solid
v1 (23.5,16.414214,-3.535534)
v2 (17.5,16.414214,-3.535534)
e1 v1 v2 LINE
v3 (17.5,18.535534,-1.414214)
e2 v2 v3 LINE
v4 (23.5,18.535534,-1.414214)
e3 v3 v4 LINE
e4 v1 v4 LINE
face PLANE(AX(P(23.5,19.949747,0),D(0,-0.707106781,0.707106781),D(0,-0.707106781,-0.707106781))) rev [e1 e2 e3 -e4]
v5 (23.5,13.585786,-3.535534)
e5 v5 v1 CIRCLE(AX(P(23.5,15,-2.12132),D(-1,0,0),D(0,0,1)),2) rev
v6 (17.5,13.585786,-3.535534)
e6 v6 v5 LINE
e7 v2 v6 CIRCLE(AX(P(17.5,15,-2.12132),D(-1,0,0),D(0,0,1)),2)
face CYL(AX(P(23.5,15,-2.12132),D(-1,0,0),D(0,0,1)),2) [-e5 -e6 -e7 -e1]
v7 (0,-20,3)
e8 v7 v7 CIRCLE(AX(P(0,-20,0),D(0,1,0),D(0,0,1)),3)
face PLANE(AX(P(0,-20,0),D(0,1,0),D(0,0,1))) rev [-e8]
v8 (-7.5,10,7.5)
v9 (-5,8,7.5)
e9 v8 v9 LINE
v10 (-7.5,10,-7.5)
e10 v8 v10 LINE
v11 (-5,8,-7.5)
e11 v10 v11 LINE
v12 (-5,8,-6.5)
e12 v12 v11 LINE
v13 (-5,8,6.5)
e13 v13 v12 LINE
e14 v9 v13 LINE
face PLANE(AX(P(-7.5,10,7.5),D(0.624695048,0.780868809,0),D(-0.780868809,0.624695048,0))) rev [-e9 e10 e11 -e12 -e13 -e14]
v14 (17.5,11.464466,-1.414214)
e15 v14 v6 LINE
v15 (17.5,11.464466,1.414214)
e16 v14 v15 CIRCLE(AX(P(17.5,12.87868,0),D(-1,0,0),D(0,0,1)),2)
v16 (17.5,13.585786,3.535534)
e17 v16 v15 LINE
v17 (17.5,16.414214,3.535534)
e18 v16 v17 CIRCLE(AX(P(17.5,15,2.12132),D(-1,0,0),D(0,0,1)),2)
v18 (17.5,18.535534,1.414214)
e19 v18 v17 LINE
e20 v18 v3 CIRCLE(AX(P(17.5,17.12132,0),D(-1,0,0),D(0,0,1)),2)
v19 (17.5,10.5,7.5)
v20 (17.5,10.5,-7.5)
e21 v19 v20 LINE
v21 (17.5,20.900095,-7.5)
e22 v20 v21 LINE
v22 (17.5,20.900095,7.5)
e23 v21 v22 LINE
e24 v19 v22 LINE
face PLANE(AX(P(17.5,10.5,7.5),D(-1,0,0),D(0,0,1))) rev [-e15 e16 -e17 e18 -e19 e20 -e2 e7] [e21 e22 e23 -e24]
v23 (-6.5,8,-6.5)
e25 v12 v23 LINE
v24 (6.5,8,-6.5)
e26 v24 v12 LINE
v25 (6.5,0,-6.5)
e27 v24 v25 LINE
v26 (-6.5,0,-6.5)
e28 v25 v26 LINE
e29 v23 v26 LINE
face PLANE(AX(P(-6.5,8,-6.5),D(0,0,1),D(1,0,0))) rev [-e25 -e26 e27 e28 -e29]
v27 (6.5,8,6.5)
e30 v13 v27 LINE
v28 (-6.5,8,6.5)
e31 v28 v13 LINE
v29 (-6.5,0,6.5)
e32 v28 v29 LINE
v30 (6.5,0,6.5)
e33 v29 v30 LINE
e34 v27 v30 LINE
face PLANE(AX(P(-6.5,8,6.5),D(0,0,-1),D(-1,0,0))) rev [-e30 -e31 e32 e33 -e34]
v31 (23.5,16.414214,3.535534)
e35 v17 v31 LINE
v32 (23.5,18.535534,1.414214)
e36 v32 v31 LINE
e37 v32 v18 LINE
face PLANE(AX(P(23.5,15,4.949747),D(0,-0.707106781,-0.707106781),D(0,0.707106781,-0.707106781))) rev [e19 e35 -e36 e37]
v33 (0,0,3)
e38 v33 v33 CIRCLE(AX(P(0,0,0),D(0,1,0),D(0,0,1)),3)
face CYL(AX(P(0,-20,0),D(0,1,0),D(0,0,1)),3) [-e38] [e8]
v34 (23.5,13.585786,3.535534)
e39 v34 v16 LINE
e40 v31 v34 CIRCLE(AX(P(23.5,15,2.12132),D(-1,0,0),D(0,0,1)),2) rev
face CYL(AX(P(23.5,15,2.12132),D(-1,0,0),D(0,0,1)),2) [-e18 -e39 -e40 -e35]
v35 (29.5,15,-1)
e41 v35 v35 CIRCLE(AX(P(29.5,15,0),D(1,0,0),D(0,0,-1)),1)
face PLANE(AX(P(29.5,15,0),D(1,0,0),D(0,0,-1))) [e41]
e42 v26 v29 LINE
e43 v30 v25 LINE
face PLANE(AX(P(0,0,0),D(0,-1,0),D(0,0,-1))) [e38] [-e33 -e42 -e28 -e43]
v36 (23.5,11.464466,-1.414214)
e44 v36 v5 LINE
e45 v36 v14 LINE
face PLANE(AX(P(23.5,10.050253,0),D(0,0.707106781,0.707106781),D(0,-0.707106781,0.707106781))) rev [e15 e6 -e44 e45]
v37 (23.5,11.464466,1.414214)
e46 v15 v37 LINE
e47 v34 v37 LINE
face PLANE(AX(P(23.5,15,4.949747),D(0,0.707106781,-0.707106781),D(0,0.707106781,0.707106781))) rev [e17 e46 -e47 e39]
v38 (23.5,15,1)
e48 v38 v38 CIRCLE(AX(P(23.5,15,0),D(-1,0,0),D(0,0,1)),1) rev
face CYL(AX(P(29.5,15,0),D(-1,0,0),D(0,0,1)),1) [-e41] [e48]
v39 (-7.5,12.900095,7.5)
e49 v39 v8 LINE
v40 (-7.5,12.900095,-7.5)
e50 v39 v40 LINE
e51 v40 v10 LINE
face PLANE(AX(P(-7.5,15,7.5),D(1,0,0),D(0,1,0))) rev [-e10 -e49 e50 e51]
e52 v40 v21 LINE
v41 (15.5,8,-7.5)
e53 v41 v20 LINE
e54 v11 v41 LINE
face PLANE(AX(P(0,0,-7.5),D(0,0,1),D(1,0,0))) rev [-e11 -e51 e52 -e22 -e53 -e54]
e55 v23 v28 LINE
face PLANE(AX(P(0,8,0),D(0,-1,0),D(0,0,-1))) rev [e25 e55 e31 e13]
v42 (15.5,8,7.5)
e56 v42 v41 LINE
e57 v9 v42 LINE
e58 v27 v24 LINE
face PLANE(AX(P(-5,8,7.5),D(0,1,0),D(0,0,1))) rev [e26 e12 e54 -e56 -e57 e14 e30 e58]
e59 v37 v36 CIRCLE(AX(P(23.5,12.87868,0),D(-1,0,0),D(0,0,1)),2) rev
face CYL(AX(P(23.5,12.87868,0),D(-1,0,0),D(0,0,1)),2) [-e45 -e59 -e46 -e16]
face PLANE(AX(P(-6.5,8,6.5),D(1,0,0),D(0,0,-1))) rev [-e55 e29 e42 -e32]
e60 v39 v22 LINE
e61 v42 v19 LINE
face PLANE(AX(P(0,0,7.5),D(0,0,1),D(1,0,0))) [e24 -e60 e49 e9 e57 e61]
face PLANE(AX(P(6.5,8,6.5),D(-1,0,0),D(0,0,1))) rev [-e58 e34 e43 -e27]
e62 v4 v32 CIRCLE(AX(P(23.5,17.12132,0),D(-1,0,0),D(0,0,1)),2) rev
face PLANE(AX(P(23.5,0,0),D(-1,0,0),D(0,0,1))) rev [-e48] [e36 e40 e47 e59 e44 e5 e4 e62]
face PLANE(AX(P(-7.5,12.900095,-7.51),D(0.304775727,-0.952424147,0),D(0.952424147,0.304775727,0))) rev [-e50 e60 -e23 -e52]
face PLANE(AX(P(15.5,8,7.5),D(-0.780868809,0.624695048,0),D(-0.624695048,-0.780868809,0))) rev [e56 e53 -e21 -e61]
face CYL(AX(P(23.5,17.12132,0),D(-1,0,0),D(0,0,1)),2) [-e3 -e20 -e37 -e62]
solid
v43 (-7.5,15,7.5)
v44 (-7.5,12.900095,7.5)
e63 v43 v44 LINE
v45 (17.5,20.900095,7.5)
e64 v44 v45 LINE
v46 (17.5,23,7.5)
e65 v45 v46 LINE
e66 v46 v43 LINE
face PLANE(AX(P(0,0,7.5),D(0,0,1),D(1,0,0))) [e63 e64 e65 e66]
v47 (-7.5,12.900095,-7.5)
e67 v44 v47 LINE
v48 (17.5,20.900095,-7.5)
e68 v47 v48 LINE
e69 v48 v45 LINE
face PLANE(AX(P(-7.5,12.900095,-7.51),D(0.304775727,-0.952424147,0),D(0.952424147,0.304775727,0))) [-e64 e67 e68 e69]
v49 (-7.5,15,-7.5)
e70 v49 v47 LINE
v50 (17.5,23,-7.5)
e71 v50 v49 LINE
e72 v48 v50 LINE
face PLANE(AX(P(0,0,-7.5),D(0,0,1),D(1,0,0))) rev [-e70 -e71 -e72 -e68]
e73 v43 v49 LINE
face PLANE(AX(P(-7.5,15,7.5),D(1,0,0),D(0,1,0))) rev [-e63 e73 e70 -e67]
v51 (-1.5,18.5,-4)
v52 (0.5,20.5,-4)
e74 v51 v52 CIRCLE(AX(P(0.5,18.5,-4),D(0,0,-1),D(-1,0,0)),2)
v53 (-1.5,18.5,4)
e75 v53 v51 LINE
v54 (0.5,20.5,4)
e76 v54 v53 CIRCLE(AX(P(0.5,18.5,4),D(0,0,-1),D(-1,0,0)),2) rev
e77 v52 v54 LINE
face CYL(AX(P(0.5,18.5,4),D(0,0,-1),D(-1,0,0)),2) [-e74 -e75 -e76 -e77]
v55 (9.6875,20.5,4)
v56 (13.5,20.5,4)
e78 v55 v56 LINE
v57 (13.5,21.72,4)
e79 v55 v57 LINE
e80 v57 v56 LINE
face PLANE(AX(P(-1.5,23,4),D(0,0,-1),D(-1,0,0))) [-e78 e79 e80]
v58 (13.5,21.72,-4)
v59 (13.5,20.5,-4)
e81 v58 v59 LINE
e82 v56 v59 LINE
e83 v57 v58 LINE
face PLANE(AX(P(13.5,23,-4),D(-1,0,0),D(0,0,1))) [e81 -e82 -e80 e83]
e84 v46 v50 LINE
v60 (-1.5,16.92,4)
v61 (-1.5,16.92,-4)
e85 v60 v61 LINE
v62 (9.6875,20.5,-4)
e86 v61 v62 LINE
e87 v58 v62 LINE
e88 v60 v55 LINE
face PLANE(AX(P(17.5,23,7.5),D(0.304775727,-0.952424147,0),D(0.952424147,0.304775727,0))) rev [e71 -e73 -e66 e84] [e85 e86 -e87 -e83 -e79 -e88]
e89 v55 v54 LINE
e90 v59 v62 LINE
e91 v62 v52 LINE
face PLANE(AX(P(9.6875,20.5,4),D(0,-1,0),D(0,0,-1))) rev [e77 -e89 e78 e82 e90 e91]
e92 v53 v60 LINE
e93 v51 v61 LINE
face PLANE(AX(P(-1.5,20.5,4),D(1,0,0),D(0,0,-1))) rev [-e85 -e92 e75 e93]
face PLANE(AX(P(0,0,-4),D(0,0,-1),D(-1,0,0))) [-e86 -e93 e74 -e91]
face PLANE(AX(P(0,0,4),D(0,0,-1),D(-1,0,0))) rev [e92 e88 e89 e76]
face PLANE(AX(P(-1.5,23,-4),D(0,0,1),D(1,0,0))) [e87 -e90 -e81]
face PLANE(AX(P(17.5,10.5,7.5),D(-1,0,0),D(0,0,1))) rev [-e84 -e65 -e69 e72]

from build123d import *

# Parameters (mm, degrees)
ESQUISSE1_R                  = 3
BOSS_EXTRU_1_DEPTH           = 20
ESQUISSE2_W                  = 13
ESQUISSE2_H                  = 13
BOSS_EXTRU_2_DEPTH           = 8
BOSS_EXTRU_3_DEPTH           = 7.5
ESQUISSE4_W                  = 11.1875
ESQUISSE4_H                  = 3.58
BOSS_EXTRU_4_DEPTH           = 4
ESQUISSE5_W                  = 15
ESQUISSE5_H                  = 8
ENL_V_MAT_EXTRU_1_DEPTH      = 45.752094923
BOSS_EXTRU_5_DEPTH           = 6
ESQUISSE7_R                  = 1
BOSS_EXTRU_6_DEPTH           = 6
CONG_1_R                     = 2
FRACTIONNER1_SURFACE_1_BACK  = 59.677
FRACTIONNER1_SURFACE_1_DEPTH = 119.354
FRACTIONNER1_SURFACE_2_BACK  = 59.677
FRACTIONNER1_SURFACE_2_DEPTH = 119.354


with BuildPart() as part:
    # Esquisse1 → Boss.-Extru.1 (new body)
    with BuildSketch(Plane(origin=(0, 0, 0), x_dir=(1, 0, 0), z_dir=(0, 1, 0))):
        with Locations(Location((0, 0, 0), (0, 0, 270))):
            Circle(ESQUISSE1_R)
    extrude(amount=-BOSS_EXTRU_1_DEPTH)

    # Esquisse2 → Boss.-Extru.2 (add)
    with BuildSketch(Plane(origin=(0, 0, 0), x_dir=(1, 0, 0), z_dir=(0, 1, 0))):
        Rectangle(ESQUISSE2_W, ESQUISSE2_H)
    extrude(amount=BOSS_EXTRU_2_DEPTH)

    # Esquisse3 → Boss.-Extru.3 (add, symmetric)
    with BuildSketch(Plane.XY):
        Polygon((-7.5, 15), (-7.5, 10), (-5, 8), (15.5, 8), (17.5, 10.5), (17.5, 23), align=None)
    extrude(amount=BOSS_EXTRU_3_DEPTH, both=True)

    # Esquisse4 → Boss.-Extru.4 (add, symmetric)
    with BuildSketch(Plane.XY):
        with Locations((4.09375, 18.71)):
            Rectangle(ESQUISSE4_W, ESQUISSE4_H)
    extrude(amount=BOSS_EXTRU_4_DEPTH, both=True)

    # Esquisse5 → Enlèv. mat.-Extru.1 (cut, through all)
    with BuildSketch(Plane(origin=(0, 20.5, 0), x_dir=(1, 0, 0), z_dir=(0, 1, 0))):
        with Locations((6, 0)):
            Rectangle(ESQUISSE5_W, ESQUISSE5_H)
    extrude(amount=ENL_V_MAT_EXTRU_1_DEPTH, mode=Mode.SUBTRACT)

    # Esquisse6 → Boss.-Extru.5 (add)
    with BuildSketch(Plane(origin=(17.5, 0, 0), x_dir=(0, 0, -1), z_dir=(1, 0, 0))):
        Polygon((-4.949747468, 15), (0, 10.050252532), (4.949747468, 15), (0, 19.949747468), align=None)
    extrude(amount=BOSS_EXTRU_5_DEPTH)

    # Esquisse7 → Boss.-Extru.6 (add)
    with BuildSketch(Plane(origin=(23.5, 0, 0), x_dir=(0, 0, -1), z_dir=(1, 0, 0))):
        with Locations(Location((0, 15, 0), (0, 0, 180))):
            Circle(ESQUISSE7_R)
    extrude(amount=BOSS_EXTRU_6_DEPTH)

    # Congé1
    # the kernel refuses this fillet: 2 mm, written as the material it takes off along each edge
    with BuildSketch(Plane(origin=(-1.5, 20.5, -9), x_dir=(0, -1, 0), z_dir=(0, 0, 1))) as cong_1_piece_1:
        with BuildLine():
            CenterArc((CONG_1_R, CONG_1_R), CONG_1_R, 180, 90)
            Line((0, CONG_1_R), (0, 0))
            Line((0, 0), (CONG_1_R, 0))
        make_face()
    extrude(amount=18, mode=Mode.SUBTRACT)
    with BuildSketch(Plane(origin=(17.5, 19.949747468, 0), x_dir=(0, -0.7071067811865478, -0.7071067811865475), z_dir=(1, 0, 0)), Plane(origin=(17.5, 15, 4.949747468), x_dir=(0, 0.707106781186548, -0.7071067811865471), z_dir=(1, 0, 0)), Plane(origin=(17.5, 15, -4.949747468), x_dir=(0, -0.7071067811865478, 0.7071067811865474), z_dir=(1, 0, 0))) as cong_1_piece_2:
        with BuildLine():
            CenterArc((CONG_1_R, -CONG_1_R), CONG_1_R, 90, 90)
            Line((0, -CONG_1_R), (0, 0))
            Line((0, 0), (CONG_1_R, 0))
        make_face()
    extrude(amount=11, mode=Mode.SUBTRACT)
    with BuildSketch(Plane(origin=(17.5, 10.050252532, 0), x_dir=(0, 0.7071067811865479, -0.7071067811865474), z_dir=(1, 0, 0))) as cong_1_piece_3:
        with BuildLine():
            CenterArc((CONG_1_R, CONG_1_R), CONG_1_R, 180, 90)
            Line((0, CONG_1_R), (0, 0))
            Line((0, 0), (CONG_1_R, 0))
        make_face()
    extrude(amount=11, mode=Mode.SUBTRACT)


with BuildPart() as body_2:
    # Fractionner1: the piece behind the surface
    add(part.part)
    # Fractionner1 surface: a surface, the sketch's curves swept straight by 119.354 mm
    with BuildLine(Plane.XY.offset(7.5).offset(-FRACTIONNER1_SURFACE_1_BACK), mode=Mode.PRIVATE) as fractionner1_surface_1_path:
        Line((-7.5, 12.90009524), (17.5, 20.90009524))
    fractionner1_surface_1 = Shell.extrude(fractionner1_surface_1_path.wire(), (0 * FRACTIONNER1_SURFACE_1_DEPTH, 0 * FRACTIONNER1_SURFACE_1_DEPTH, 1 * FRACTIONNER1_SURFACE_1_DEPTH))
    split(bisect_by=fractionner1_surface_1, keep=Keep.BOTTOM)


with BuildPart() as part_1:
    add(part.part)

    # Fractionner1: split by a surface, the side it looks to stays
    # Fractionner1 surface: a surface, the sketch's curves swept straight by 119.354 mm
    with BuildLine(Plane.XY.offset(7.5).offset(-FRACTIONNER1_SURFACE_2_BACK), mode=Mode.PRIVATE) as fractionner1_surface_2_path:
        Line((-7.5, 12.90009524), (17.5, 20.90009524))
    fractionner1_surface_2 = Shell.extrude(fractionner1_surface_2_path.wire(), (0 * FRACTIONNER1_SURFACE_2_DEPTH, 0 * FRACTIONNER1_SURFACE_2_DEPTH, 1 * FRACTIONNER1_SURFACE_2_DEPTH))
    split(bisect_by=fractionner1_surface_2, keep=Keep.TOP)


solid = Compound([body_2.part, part_1.part])
